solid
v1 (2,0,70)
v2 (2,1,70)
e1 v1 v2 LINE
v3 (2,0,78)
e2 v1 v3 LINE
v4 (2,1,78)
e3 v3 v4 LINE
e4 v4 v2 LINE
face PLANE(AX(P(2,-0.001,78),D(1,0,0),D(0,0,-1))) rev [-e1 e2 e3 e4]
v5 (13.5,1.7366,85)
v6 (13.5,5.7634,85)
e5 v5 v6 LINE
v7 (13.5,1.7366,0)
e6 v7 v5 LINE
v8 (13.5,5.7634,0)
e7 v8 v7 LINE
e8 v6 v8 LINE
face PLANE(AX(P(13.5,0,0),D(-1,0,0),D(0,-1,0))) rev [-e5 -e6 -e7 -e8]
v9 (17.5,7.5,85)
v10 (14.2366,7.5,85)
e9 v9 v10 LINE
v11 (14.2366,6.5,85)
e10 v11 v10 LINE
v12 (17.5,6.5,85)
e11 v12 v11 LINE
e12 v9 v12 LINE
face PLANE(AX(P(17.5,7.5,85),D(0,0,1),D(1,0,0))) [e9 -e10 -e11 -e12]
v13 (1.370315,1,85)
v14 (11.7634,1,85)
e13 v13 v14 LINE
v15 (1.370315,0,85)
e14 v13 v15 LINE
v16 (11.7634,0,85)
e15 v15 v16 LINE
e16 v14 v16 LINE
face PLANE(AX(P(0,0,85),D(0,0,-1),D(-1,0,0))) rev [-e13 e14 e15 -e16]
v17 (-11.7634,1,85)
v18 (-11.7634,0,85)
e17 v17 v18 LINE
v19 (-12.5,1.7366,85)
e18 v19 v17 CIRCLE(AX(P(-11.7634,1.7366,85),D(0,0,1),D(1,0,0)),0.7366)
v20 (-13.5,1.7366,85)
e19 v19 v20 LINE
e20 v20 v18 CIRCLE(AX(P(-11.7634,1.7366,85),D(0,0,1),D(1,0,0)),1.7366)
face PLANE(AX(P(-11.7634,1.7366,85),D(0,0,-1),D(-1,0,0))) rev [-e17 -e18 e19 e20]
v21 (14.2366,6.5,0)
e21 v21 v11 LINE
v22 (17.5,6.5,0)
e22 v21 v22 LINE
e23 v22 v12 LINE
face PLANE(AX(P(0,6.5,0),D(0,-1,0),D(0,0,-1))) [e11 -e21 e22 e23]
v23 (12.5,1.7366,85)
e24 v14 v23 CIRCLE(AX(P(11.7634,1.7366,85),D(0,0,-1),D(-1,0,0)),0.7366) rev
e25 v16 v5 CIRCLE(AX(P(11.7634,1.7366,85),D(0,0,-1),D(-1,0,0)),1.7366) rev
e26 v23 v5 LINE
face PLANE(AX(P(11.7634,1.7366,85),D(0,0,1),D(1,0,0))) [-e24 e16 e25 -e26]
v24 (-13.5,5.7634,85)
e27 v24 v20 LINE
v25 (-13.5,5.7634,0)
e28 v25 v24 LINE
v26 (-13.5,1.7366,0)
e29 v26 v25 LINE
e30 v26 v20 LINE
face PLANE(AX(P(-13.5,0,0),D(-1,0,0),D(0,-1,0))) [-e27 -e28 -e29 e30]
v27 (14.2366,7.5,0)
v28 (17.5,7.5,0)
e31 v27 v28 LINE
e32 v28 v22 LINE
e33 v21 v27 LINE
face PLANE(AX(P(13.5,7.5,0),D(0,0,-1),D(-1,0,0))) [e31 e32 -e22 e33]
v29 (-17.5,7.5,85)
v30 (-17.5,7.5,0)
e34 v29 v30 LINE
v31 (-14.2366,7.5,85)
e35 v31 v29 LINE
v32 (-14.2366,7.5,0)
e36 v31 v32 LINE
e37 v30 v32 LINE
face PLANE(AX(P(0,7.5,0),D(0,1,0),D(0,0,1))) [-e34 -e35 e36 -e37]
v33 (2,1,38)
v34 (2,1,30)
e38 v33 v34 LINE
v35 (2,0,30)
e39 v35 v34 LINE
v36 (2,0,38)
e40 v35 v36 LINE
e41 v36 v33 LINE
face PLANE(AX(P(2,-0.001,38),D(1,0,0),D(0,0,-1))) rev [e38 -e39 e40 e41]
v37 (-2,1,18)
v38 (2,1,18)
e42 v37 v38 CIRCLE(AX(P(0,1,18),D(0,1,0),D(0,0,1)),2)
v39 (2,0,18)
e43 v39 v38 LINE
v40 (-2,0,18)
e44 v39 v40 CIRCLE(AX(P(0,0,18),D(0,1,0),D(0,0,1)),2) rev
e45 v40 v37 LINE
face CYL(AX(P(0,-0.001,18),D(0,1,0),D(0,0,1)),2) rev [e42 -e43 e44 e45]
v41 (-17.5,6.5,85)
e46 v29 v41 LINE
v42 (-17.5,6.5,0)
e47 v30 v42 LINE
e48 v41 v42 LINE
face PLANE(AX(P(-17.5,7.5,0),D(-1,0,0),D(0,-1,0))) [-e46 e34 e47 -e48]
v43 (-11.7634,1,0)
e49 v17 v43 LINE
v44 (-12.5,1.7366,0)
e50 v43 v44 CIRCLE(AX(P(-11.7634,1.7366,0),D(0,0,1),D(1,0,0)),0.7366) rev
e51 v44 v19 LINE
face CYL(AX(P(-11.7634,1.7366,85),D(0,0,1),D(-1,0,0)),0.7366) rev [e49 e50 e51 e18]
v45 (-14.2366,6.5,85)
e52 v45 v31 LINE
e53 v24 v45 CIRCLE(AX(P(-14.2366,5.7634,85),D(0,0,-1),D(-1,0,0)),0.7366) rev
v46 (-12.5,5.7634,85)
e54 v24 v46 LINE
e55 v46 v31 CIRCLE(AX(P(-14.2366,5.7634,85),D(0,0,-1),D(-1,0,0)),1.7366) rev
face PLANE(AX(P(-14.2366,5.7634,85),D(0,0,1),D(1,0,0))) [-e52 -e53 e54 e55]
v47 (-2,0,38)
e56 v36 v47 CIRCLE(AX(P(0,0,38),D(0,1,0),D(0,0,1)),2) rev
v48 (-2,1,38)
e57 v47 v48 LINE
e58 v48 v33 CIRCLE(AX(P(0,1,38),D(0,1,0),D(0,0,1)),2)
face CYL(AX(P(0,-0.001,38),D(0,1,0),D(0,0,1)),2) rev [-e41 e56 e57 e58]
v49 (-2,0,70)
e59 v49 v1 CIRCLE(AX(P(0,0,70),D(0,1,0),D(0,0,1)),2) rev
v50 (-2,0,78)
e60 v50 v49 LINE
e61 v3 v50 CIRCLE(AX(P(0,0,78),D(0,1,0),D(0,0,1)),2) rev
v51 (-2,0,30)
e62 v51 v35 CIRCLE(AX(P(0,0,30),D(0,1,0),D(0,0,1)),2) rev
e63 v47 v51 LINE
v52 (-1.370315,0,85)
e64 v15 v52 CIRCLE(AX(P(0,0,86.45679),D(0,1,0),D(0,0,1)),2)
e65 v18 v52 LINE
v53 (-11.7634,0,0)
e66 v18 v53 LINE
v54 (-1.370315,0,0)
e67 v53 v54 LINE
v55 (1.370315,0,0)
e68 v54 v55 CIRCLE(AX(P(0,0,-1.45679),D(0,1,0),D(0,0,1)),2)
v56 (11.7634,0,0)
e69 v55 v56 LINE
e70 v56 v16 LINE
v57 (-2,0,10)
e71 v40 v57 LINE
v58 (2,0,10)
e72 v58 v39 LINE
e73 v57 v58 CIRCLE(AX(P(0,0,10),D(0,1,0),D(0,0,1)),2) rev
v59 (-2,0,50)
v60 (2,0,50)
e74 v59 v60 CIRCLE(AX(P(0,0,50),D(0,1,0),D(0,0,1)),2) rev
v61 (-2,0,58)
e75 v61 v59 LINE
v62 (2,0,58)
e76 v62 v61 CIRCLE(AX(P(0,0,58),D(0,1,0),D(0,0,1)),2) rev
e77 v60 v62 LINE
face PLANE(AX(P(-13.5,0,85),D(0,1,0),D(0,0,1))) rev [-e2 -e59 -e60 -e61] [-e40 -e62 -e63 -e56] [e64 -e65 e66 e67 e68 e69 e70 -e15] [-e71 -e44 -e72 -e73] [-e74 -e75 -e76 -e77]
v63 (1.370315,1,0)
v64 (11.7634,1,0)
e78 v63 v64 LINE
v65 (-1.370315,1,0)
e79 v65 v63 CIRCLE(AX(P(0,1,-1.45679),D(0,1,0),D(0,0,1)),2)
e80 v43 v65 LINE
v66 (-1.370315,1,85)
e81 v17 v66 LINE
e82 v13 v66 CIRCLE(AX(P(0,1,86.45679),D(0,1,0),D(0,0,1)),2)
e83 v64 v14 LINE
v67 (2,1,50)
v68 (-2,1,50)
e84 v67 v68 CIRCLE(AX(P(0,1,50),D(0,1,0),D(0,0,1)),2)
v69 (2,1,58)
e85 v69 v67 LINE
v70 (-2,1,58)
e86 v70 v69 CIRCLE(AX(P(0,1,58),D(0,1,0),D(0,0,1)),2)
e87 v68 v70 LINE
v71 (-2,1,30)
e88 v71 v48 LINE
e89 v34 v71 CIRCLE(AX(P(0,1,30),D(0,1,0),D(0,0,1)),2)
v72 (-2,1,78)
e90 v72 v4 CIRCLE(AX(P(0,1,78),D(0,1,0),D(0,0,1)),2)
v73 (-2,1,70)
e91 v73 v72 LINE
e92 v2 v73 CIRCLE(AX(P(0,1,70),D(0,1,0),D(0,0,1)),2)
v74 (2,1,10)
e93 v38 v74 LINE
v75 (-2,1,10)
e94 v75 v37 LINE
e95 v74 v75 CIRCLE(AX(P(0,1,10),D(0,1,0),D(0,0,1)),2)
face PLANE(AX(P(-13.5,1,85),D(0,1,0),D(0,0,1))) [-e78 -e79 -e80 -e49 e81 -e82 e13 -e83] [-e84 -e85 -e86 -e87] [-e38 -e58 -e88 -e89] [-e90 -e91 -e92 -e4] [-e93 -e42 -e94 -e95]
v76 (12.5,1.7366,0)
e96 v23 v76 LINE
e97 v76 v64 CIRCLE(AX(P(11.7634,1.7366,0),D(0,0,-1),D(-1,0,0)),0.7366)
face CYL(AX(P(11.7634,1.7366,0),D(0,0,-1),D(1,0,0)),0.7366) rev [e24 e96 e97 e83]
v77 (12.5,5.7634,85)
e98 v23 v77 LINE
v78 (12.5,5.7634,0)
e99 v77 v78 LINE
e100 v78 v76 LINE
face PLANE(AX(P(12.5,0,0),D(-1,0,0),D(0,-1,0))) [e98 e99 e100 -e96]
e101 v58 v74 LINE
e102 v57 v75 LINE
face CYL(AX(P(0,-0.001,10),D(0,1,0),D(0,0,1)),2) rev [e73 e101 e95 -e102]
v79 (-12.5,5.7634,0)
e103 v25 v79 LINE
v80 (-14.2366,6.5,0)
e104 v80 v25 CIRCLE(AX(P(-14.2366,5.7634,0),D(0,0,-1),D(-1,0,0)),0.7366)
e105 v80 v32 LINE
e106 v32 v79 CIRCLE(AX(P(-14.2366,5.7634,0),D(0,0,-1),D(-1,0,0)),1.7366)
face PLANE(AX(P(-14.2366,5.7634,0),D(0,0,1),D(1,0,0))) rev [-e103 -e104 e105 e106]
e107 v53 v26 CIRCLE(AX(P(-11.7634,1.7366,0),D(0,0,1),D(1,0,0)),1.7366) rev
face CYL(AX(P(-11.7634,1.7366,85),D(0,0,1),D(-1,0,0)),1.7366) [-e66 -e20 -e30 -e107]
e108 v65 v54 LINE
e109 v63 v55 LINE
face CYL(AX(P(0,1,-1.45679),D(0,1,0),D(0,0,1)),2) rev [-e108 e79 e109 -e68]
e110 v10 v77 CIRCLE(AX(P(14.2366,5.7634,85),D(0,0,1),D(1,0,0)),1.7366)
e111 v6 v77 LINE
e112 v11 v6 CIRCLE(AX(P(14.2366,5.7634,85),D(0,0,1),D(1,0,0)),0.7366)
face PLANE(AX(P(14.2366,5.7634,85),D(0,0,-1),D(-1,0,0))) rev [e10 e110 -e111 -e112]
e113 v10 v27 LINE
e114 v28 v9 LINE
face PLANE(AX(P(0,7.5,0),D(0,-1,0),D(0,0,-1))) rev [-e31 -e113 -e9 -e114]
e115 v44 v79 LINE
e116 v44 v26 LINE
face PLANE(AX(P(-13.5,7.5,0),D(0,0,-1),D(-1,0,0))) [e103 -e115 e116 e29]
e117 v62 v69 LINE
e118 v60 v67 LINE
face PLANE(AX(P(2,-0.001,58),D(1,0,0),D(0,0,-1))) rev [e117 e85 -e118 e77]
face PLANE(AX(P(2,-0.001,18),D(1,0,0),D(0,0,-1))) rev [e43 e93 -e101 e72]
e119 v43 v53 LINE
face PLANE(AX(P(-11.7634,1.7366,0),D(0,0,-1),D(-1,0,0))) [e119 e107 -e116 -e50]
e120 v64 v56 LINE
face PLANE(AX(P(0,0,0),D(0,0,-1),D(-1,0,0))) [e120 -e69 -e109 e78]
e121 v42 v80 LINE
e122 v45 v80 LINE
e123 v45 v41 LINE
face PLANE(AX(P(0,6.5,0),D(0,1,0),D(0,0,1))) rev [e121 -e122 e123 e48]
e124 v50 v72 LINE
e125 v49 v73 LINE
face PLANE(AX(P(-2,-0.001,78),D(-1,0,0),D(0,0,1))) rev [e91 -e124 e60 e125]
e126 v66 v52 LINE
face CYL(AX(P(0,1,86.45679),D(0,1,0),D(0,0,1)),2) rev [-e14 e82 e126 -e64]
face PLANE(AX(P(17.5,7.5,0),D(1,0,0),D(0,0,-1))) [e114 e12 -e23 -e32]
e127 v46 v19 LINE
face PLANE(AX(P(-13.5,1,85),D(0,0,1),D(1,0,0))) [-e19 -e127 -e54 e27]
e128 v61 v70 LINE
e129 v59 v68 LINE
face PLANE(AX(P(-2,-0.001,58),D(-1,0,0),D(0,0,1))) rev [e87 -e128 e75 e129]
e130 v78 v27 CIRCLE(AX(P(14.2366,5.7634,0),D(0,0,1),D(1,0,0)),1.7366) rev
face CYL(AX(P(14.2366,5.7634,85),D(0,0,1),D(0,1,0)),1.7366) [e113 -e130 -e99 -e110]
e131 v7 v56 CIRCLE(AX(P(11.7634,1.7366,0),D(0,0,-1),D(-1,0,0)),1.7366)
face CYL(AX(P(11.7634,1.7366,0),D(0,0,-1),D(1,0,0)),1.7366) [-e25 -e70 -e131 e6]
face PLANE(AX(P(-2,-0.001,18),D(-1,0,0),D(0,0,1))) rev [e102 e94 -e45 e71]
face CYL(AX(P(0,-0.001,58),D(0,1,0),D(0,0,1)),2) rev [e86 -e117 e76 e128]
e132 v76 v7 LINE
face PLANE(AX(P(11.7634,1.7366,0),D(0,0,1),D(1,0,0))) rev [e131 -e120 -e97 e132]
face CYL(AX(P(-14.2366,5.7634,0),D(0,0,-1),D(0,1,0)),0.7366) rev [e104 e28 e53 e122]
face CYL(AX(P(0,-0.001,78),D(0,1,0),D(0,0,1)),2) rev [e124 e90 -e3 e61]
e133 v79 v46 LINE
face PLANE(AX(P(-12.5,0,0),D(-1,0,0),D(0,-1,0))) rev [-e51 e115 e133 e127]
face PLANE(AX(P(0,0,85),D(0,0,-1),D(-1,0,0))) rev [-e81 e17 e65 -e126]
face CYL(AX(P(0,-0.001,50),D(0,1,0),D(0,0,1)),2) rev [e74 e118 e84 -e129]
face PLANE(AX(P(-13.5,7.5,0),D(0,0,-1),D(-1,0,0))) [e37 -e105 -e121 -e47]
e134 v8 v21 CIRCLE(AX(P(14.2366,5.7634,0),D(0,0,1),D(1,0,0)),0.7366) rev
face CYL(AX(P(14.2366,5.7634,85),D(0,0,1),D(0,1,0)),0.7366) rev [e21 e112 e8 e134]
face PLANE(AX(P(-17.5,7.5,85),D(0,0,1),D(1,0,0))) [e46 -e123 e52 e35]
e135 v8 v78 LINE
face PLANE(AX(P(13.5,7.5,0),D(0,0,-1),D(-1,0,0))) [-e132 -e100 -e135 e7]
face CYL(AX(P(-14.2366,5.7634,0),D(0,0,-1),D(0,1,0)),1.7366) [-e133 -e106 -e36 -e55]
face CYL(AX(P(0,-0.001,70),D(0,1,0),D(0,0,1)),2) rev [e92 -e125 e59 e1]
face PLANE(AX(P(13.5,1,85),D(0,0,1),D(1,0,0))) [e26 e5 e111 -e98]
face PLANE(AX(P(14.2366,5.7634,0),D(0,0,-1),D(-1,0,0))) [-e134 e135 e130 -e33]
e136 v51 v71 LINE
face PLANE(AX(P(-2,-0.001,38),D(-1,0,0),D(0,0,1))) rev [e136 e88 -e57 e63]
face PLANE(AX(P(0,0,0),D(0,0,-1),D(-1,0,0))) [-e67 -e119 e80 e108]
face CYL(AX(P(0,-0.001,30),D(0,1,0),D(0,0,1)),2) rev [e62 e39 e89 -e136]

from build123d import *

# Parameters (mm, degrees)
SKETCH_1_W                         = 27
SKETCH_1_H                         = 1
SM_BASE_FLANGE_1_DEPTH             = 85
SM_EDGE_FLANGE_1_STRIP_W           = 5.4732
SM_EDGE_FLANGE_1_STRIP_H           = 1
SM_EDGE_FLANGE_1_STRIP_CUT_DEPTH   = 85
SM_EDGE_FLANGE_1_STRIP_2_W         = 5.4732
SM_EDGE_FLANGE_1_STRIP_2_H         = 1
SM_EDGE_FLANGE_1_STRIP_CUT_2_DEPTH = 85
SM_EDGE_FLANGE_1_DEPTH             = 85
SM_EDGE_FLANGE_1_BEND_DEPTH        = 85
SM_EDGE_FLANGE_2_STRIP_W           = 5.4732
SM_EDGE_FLANGE_2_STRIP_H           = 1
SM_EDGE_FLANGE_2_STRIP_CUT_DEPTH   = 85
SM_EDGE_FLANGE_2_STRIP_2_W         = 5.4732
SM_EDGE_FLANGE_2_STRIP_2_H         = 1
SM_EDGE_FLANGE_2_STRIP_CUT_2_DEPTH = 85
SM_EDGE_FLANGE_2_DEPTH             = 85
SM_EDGE_FLANGE_2_BEND_DEPTH        = 85
CUT_EXTRUDE_2_DEPTH                = 88.025858226
CUT_EXTRUDE_1_REACH                = 89.026
OTHER_3_DEPTH                      = 1


# Read off the part's stored shape, not the designer's step: Образец заполнения3
# Sheet-metal steps are written as plain solids
with BuildPart() as part:
    # Sketch 1 → Базовая кромка1 (new body)
    with BuildSketch(Plane.XY):
        with Locations((0, 0.5)):
            Rectangle(SKETCH_1_W, SKETCH_1_H)
    extrude(amount=SM_BASE_FLANGE_1_DEPTH)

    # Ребро-кромка1 strip (across the edge) → Ребро-кромка1 strip cut (cut)
    with BuildSketch(Plane(origin=(-13.5, 1, 0), x_dir=(1, 0, 0), z_dir=(0, 0, 1))):
        with Locations((-1, -0.5)):
            Rectangle(SM_EDGE_FLANGE_1_STRIP_W, SM_EDGE_FLANGE_1_STRIP_H)
    extrude(amount=SM_EDGE_FLANGE_1_STRIP_CUT_DEPTH, mode=Mode.SUBTRACT)

    # Ребро-кромка1 strip 2 (across the edge) → Ребро-кромка1 strip cut 2 (cut)
    with BuildSketch(Plane(origin=(13.5, 1, 85), x_dir=(-1, 0, 0), z_dir=(0, 0, -1))):
        with Locations((-1, -0.5)):
            Rectangle(SM_EDGE_FLANGE_1_STRIP_2_W, SM_EDGE_FLANGE_1_STRIP_2_H)
    extrude(amount=SM_EDGE_FLANGE_1_STRIP_CUT_2_DEPTH, mode=Mode.SUBTRACT)

    # Ребро-кромка1 section (across the edge) → Ребро-кромка1 (add)
    with BuildSketch(Plane(origin=(-13.5, 1, 0), x_dir=(1, 0, 0), z_dir=(0, 0, 1))):
        with BuildLine():
            Line((0, 0.7366), (0, 6.5))
            Line((0, 6.5), (1, 6.5))
            Line((1, 6.5), (1, 0.7366))
            ThreePointArc((1, 0.7366), (1.215745145, 0.215745145), (1.7366, 0))
            Line((1.7366, 0), (1.7366, -1))
            ThreePointArc((1.7366, -1), (0.508638364, -0.491361636), (0, 0.7366))
        make_face()
    extrude(amount=SM_EDGE_FLANGE_1_DEPTH)

    # Ребро-кромка1 section 2 (across the edge) → Ребро-кромка1 bend (add)
    with BuildSketch(Plane(origin=(13.5, 1, 85), x_dir=(-1, 0, 0), z_dir=(0, 0, -1))):
        with BuildLine():
            Line((0, 0.7366), (0, 6.5))
            Line((0, 6.5), (1, 6.5))
            Line((1, 6.5), (1, 0.7366))
            ThreePointArc((1, 0.7366), (1.215745145, 0.215745145), (1.7366, 0))
            Line((1.7366, 0), (1.7366, -1))
            ThreePointArc((1.7366, -1), (0.508638364, -0.491361636), (0, 0.7366))
        make_face()
    extrude(amount=SM_EDGE_FLANGE_1_BEND_DEPTH)

    # Ребро-кромка2 strip (across the edge) → Ребро-кромка2 strip cut (cut)
    with BuildSketch(Plane(origin=(-13.5, 7.5, 85), x_dir=(0, -1, 0), z_dir=(0, 0, -1))):
        with Locations((-1, -0.5)):
            Rectangle(SM_EDGE_FLANGE_2_STRIP_W, SM_EDGE_FLANGE_2_STRIP_H)
    extrude(amount=SM_EDGE_FLANGE_2_STRIP_CUT_DEPTH, mode=Mode.SUBTRACT)

    # Ребро-кромка2 strip 2 (across the edge) → Ребро-кромка2 strip cut 2 (cut)
    with BuildSketch(Plane(origin=(13.5, 7.5, 0), x_dir=(0, -1, 0), z_dir=(0, 0, 1))):
        with Locations((-1, -0.5)):
            Rectangle(SM_EDGE_FLANGE_2_STRIP_2_W, SM_EDGE_FLANGE_2_STRIP_2_H)
    extrude(amount=SM_EDGE_FLANGE_2_STRIP_CUT_2_DEPTH, mode=Mode.SUBTRACT)

    # Ребро-кромка2 section (across the edge) → Ребро-кромка2 (add)
    with BuildSketch(Plane(origin=(-13.5, 7.5, 85), x_dir=(0, -1, 0), z_dir=(0, 0, -1))):
        with BuildLine():
            Line((0, 0.7366), (0, 4))
            Line((0, 4), (1, 4))
            Line((1, 4), (1, 0.7366))
            ThreePointArc((1, 0.7366), (1.215745145, 0.215745145), (1.7366, 0))
            Line((1.7366, 0), (1.7366, -1))
            ThreePointArc((1.7366, -1), (0.508638364, -0.491361636), (0, 0.7366))
        make_face()
    extrude(amount=SM_EDGE_FLANGE_2_DEPTH)

    # Ребро-кромка2 section 2 (across the edge) → Ребро-кромка2 bend (add)
    with BuildSketch(Plane(origin=(13.5, 7.5, 0), x_dir=(0, -1, 0), z_dir=(0, 0, 1))):
        with BuildLine():
            Line((0, 0.7366), (0, 4))
            Line((0, 4), (1, 4))
            Line((1, 4), (1, 0.7366))
            ThreePointArc((1, 0.7366), (1.215745145, 0.215745145), (1.7366, 0))
            Line((1.7366, 0), (1.7366, -1))
            ThreePointArc((1.7366, -1), (0.508638364, -0.491361636), (0, 0.7366))
        make_face()
    extrude(amount=SM_EDGE_FLANGE_2_BEND_DEPTH)

    # Эскиз19 → Вырез-Вытянуть2 (cut, through all)
    with BuildSketch(Plane(origin=(0, 1, 0), x_dir=(1, 0, 0), z_dir=(0, 1, 0))):
        with BuildLine():
            Line((-1.370314889, 0), (1.370314889, 0))
            ThreePointArc((1.370314889, 0), (0, -0.54321), (-1.370314889, 0))
        make_face()
        with BuildLine():
            Line((-1.370314889, -85), (1.370314889, -85))
            ThreePointArc((1.370314889, -85), (0, -84.45679), (-1.370314889, -85))
        make_face()
    extrude(amount=-CUT_EXTRUDE_2_DEPTH, mode=Mode.SUBTRACT)

    # Эскиз18 → Вырез-Вытянуть1 (cut, up to next)
    with BuildSketch(Plane(origin=(0, 1, 0), x_dir=(1, 0, 0), z_dir=(0, 1, 0)), mode=Mode.PRIVATE) as cut_extrude_1_sk1:
        with BuildLine():
            Line((-2, -18), (-2, -10))
            ThreePointArc((-2, -10), (0, -8), (2, -10))
            Line((2, -10), (2, -18))
            ThreePointArc((2, -18), (0, -20), (-2, -18))
        make_face()
    cut_extrude_1_tool1 = extrude(cut_extrude_1_sk1.sketch, amount=-CUT_EXTRUDE_1_REACH, mode=Mode.PRIVATE) & part.part
    add(cut_extrude_1_tool1.solids().sort_by_distance((0, 1, 14))[0], mode=Mode.SUBTRACT)

    # Образец заполнения3 outline → Образец заполнения3 (cut)
    with BuildSketch(Plane(origin=(0, 0, 0), x_dir=(1, 0, 0), z_dir=(0, 1, 0))):
        with BuildLine():
            ThreePointArc((2, -30), (0, -28), (-2, -30))
            Line((-2, -30), (-2, -38))
            ThreePointArc((-2, -38), (0, -40), (2, -38))
            Line((2, -38), (2, -30))
        make_face()
        with BuildLine():
            ThreePointArc((2, -70), (0, -68), (-2, -70))
            Line((-2, -70), (-2, -78))
            ThreePointArc((-2, -78), (0, -80), (2, -78))
            Line((2, -78), (2, -70))
        make_face()
        with BuildLine():
            ThreePointArc((2, -50), (0, -48), (-2, -50))
            Line((-2, -50), (-2, -58))
            ThreePointArc((-2, -58), (0, -60), (2, -58))
            Line((2, -58), (2, -50))
        make_face()
    extrude(amount=OTHER_3_DEPTH, mode=Mode.SUBTRACT)


solid = part.part
